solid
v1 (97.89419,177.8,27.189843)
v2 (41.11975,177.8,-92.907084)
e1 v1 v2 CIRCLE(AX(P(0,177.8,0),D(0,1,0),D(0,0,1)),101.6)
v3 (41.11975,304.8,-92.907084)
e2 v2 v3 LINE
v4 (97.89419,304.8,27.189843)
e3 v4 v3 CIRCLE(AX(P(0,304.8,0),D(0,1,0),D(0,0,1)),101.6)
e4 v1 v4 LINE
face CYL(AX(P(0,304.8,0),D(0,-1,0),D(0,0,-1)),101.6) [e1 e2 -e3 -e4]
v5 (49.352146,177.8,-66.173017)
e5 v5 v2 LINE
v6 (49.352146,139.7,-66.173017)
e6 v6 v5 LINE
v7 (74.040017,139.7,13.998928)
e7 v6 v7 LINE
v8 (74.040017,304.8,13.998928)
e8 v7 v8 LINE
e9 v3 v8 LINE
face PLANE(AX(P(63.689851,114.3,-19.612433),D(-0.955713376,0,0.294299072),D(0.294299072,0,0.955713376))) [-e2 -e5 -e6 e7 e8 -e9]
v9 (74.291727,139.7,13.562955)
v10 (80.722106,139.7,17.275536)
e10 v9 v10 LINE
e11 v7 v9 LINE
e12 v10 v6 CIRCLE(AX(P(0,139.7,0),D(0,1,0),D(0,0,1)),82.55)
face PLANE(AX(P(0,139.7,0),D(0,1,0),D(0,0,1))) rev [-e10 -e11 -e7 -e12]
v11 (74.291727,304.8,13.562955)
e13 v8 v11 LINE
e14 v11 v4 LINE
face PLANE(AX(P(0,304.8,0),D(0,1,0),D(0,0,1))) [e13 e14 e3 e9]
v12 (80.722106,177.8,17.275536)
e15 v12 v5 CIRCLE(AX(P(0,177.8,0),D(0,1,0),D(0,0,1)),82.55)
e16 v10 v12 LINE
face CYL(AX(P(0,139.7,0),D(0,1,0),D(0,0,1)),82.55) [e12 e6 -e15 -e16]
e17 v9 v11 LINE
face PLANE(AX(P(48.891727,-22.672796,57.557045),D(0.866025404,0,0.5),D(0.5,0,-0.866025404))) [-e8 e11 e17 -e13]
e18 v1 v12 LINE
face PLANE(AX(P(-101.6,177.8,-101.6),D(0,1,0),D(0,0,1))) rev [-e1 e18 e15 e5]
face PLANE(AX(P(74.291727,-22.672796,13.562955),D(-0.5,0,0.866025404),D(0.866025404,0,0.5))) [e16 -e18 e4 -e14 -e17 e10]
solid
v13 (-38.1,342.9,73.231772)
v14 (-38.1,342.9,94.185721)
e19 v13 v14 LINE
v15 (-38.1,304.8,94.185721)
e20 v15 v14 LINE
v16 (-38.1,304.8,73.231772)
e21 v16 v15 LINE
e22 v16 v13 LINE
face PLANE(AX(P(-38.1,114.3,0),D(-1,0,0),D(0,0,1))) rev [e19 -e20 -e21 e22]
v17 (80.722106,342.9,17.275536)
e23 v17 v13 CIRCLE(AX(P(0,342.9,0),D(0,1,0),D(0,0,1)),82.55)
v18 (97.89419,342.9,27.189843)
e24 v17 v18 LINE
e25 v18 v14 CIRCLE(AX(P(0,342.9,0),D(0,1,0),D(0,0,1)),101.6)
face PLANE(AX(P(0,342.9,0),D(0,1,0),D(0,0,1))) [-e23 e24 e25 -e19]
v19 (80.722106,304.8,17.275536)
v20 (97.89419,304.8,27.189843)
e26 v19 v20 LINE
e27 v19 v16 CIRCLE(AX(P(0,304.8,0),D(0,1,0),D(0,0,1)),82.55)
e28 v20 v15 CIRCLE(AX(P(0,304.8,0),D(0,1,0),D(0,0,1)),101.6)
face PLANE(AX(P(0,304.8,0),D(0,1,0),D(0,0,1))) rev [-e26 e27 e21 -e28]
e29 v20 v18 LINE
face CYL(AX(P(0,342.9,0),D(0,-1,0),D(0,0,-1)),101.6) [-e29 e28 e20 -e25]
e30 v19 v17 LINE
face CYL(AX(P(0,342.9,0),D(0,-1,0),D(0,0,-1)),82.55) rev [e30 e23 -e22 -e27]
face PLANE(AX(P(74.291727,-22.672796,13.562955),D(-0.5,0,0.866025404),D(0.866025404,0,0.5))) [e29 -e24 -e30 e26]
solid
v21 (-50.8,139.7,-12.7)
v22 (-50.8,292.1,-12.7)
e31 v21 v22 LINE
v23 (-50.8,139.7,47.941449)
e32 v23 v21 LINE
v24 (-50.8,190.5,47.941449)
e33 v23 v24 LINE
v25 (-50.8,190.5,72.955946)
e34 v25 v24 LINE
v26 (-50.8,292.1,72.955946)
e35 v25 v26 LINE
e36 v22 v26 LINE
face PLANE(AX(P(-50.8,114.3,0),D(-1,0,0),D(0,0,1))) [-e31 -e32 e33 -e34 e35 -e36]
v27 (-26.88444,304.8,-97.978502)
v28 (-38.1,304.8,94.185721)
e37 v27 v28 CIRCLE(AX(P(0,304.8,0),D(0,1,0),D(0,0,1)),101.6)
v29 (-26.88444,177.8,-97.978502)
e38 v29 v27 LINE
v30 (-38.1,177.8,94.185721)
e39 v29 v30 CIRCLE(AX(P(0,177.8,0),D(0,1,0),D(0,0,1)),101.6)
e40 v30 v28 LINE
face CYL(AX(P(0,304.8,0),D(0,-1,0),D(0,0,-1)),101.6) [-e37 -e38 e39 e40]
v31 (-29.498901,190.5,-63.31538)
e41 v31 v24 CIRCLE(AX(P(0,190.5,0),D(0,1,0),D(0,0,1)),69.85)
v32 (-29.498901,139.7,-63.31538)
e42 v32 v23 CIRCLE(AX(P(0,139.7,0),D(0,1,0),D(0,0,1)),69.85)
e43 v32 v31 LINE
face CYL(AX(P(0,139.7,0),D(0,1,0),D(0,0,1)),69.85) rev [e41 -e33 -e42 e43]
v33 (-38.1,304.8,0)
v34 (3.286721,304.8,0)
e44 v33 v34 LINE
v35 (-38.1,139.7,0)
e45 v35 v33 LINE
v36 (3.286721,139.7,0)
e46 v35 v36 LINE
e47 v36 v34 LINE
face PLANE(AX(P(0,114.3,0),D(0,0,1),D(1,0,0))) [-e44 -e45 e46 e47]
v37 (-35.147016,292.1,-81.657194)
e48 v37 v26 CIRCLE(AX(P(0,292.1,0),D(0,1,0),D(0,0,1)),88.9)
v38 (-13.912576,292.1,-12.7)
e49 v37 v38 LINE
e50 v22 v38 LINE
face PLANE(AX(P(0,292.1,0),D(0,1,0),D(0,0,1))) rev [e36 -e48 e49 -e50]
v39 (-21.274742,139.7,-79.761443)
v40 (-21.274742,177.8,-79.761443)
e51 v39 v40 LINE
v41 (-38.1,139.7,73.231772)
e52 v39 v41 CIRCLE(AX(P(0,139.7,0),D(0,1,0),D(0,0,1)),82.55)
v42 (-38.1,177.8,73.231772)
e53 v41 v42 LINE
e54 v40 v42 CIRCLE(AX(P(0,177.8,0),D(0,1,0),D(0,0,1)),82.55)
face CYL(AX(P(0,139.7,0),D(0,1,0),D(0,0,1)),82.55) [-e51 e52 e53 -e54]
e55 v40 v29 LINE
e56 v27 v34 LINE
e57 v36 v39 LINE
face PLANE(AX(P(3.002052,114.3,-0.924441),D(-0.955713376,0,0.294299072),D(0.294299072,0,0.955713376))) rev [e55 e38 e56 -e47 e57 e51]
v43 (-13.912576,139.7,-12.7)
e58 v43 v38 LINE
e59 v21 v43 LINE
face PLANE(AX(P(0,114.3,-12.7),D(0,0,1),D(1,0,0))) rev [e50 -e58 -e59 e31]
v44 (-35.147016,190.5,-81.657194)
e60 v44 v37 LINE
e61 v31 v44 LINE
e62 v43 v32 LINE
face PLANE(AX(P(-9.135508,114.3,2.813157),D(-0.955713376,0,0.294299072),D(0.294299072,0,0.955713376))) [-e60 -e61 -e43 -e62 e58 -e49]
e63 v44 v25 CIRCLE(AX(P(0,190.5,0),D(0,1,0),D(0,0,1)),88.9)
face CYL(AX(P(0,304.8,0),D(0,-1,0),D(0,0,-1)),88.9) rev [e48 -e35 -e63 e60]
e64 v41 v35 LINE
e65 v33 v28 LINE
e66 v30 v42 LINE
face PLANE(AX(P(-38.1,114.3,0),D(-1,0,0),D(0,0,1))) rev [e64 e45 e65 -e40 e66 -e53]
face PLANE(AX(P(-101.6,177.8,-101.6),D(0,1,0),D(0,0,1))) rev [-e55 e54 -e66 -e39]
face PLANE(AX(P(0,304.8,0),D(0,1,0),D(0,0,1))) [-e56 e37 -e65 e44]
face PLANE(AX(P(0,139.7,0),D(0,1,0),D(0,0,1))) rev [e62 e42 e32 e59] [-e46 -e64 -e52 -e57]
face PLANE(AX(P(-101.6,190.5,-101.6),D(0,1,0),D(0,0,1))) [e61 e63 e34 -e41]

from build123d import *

# Parameters (mm, degrees)
SKETCH2_R               = 101.6
BOSS_EXTRUDE1_DEPTH     = 304.8
SKETCH3_R               = 101.6
SKETCH3_R_2             = 82.55
BOSS_EXTRUDE2_DEPTH     = 38.1
SKETCH4_W               = 76.2
SKETCH4_H               = 101.6
CUT_EXTRUDE1_DEPTH      = 228.6
CUT_EXTRUDE2_START      = -228.6
CUT_EXTRUDE2_DEPTH      = 190.5
SKETCH5_R               = 76.2
CUT_EXTRUDE3_DEPTH      = 25.4
CUT_EXTRUDE4_START      = -228.6
CUT_EXTRUDE4_DEPTH      = 228.6
CUT_EXTRUDE5_DEPTH      = 372.786941675
CUT_EXTRUDE6_DEPTH      = 372.786941675
CUT_EXTRUDE6_DEPTH_BACK = 372.786941675
SKETCH8_W               = 203.2
SKETCH8_H               = 177.8
BOSS_EXTRUDE3_START     = -165.1
BOSS_EXTRUDE3_DEPTH     = 38.1
SHELL1_START            = 190.5
SHELL1_DEPTH            = 101.6
SHELL1_START_2          = 139.7
SHELL1_2_DEPTH          = 50.8


# Read off the part's stored shape, not the designer's step: Shell1
with BuildPart() as part:
    # Sketch2 → Boss-Extrude1 (new body)
    with BuildSketch(Plane(origin=(0, 0, 0), x_dir=(1, 0, 0), z_dir=(0, 1, 0))):
        with Locations(Location((0, 0, 0), (0, 0, 90))):
            Circle(SKETCH2_R)
    extrude(amount=BOSS_EXTRUDE1_DEPTH)


with BuildPart() as body_2:
    # Sketch3 → Boss-Extrude2 (new body)
    with BuildSketch(Plane(origin=(0, 304.8, 0), x_dir=(1, 0, 0), z_dir=(0, 1, 0))):
        with Locations(Location((0, 0, 0), (0, 0, 90))):
            Circle(SKETCH3_R)
        with Locations(Location((0, 0, 0), (0, 0, 90))):
            Circle(SKETCH3_R_2, mode=Mode.SUBTRACT)
    extrude(amount=BOSS_EXTRUDE2_DEPTH)


with BuildPart() as cut_extrude1_tool:
    # Sketch4 → Cut-Extrude1 (new body)
    with BuildSketch(Plane(origin=(0, 342.9, 0), x_dir=(1, 0, 0), z_dir=(0, 1, 0))):
        with Locations((0, -50.8)):
            Rectangle(SKETCH4_W, SKETCH4_H)
    extrude(amount=-CUT_EXTRUDE1_DEPTH)


with BuildPart() as part_1:
    add(part.part)

    # Cut-Extrude1: cut by cut_extrude1_tool
    add(cut_extrude1_tool.part, mode=Mode.SUBTRACT)

    # Sketch4<4> → Cut-Extrude2 (cut)
    with BuildSketch(Plane(origin=(0, 342.9, 0), x_dir=(1, 0, 0), z_dir=(0, 1, 0)).offset(CUT_EXTRUDE2_START)):
        with BuildLine():
            ThreePointArc((78.027556588, -26.94815231), (62.505565542, -53.92176533), (38.1, -73.231772476))
            Line((38.1, -73.231772476), (38.1, -94.185720786))
            ThreePointArc((38.1, -94.185720786), (65.394822961, -77.756524678), (86.259952515, -53.682218584))
            Line((86.259952515, -53.682218584), (78.027556588, -26.94815231))
        make_face()
        with BuildLine():
            Line((-21.27474203, 79.761443389), (3.286721048, 0))
            Line((3.286721048, 0), (38.1, 0))
            Line((38.1, 0), (38.1, -73.231772476))
            ThreePointArc((38.1, -73.231772476), (62.505565542, -53.92176533), (78.027556588, -26.94815231))
            Line((78.027556588, -26.94815231), (49.352145598, 66.173017347))
            ThreePointArc((49.352145598, 66.173017347), (15.596361061, 81.063284054), (-21.27474203, 79.761443389))
        make_face()
        with BuildLine():
            Line((-26.884440108, 97.978502132), (-21.27474203, 79.761443389))
            ThreePointArc((-21.27474203, 79.761443389), (15.596361061, 81.063284054), (49.352145598, 66.173017347))
            Line((49.352145598, 66.173017347), (41.119749671, 92.907083621))
            ThreePointArc((41.119749671, 92.907083621), (7.555847472, 101.318651634), (-26.884440108, 97.978502132))
        make_face()
    extrude(amount=CUT_EXTRUDE2_DEPTH, mode=Mode.SUBTRACT)

    # Sketch5 → Cut-Extrude3 (cut)
    with BuildSketch(Plane.XZ):
        with Locations(Location((0, 0, 0), (0, 0, 270))):
            Circle(SKETCH5_R)
    extrude(amount=-CUT_EXTRUDE3_DEPTH, mode=Mode.SUBTRACT)


with BuildPart() as body_2_1:
    add(body_2.part)

    # Cut-Extrude1: cut by cut_extrude1_tool
    add(cut_extrude1_tool.part, mode=Mode.SUBTRACT)


with BuildPart() as cut_extrude4_tool:
    # Sketch6 → Cut-Extrude4 (new body)
    with BuildSketch(Plane(origin=(0, 342.9, 0), x_dir=(1, 0, 0), z_dir=(0, 1, 0)).offset(CUT_EXTRUDE4_START)):
        Polygon((48.891726717, -57.557045256), (74.291726717, -13.562954744), (107.287294601, -32.612954744), (60.297294601, -114.002022192), (14.155449479, -87.362015489), (35.745449479, -49.967038554), align=None)
    extrude(amount=CUT_EXTRUDE4_DEPTH)


with BuildPart() as part_2:
    add(part_1.part)

    # Cut-Extrude4: cut by cut_extrude4_tool
    add(cut_extrude4_tool.part, mode=Mode.SUBTRACT)

    # Sketch6<4> → Cut-Extrude5 (cut, through all)
    with BuildSketch(Plane(origin=(0, 342.9, 0), x_dir=(1, 0, 0), z_dir=(0, 1, 0))):
        with BuildLine():
            ThreePointArc((97.894189943, -27.189843241), (87.988181024, -50.8), (72.494189943, -71.183933753))
            Line((72.494189943, -71.183933753), (81.887294601, -76.607045256))
            Line((81.887294601, -76.607045256), (107.287294601, -32.612954744))
            Line((107.287294601, -32.612954744), (97.894189943, -27.189843241))
        make_face()
        with BuildLine():
            ThreePointArc((80.722105782, -17.275535828), (71.490397082, -41.275), (55.322105782, -61.26962634))
            Line((55.322105782, -61.26962634), (72.494189943, -71.183933753))
            ThreePointArc((72.494189943, -71.183933753), (87.988181024, -50.8), (97.894189943, -27.189843241))
            Line((97.894189943, -27.189843241), (80.722105782, -17.275535828))
        make_face()
        with BuildLine():
            Line((74.291726717, -13.562954744), (48.891726717, -57.557045256))
            Line((48.891726717, -57.557045256), (55.322105782, -61.26962634))
            ThreePointArc((55.322105782, -61.26962634), (71.490397082, -41.275), (80.722105782, -17.275535828))
            Line((80.722105782, -17.275535828), (74.291726717, -13.562954744))
        make_face()
    extrude(amount=-CUT_EXTRUDE5_DEPTH, mode=Mode.SUBTRACT)

    # Sketch8 → Cut-Extrude6 (cut, two sides: drawn at the far end of the back side and taken through both)
    with BuildSketch(Plane.XY.offset(-CUT_EXTRUDE6_DEPTH_BACK)):
        with Locations((0, 88.9)):
            Rectangle(SKETCH8_W, SKETCH8_H)
    extrude(amount=CUT_EXTRUDE6_DEPTH + CUT_EXTRUDE6_DEPTH_BACK, mode=Mode.SUBTRACT)


with BuildPart() as body_2_2:
    add(body_2_1.part)

    # Cut-Extrude4: cut by cut_extrude4_tool
    add(cut_extrude4_tool.part, mode=Mode.SUBTRACT)


with BuildPart() as cut_extrude6_piece_1:
    # of the separate pieces the step leaves, piece 1, a body of its own (cut_extrude6_pieces)
    add(part_2.part.solids().sort_by_distance((-26.884440108, 177.8, -97.978502132))[0])



with BuildPart() as cut_extrude6_piece_2:
    # of the separate pieces the step leaves, piece 2, a body of its own (cut_extrude6_pieces)
    add(part_2.part.solids().sort_by_distance((41.119749671, 177.8, -92.907083621))[0])


with BuildPart() as cut_extrude6_piece_1_1:
    add(cut_extrude6_piece_1.part)

    add(cut_extrude6_piece_2.part)  # Boss-Extrude3 merges Cut-Extrude6 piece 2
    # Sketch7 → Boss-Extrude3 (add)
    with BuildSketch(Plane(origin=(0, 342.9, 0), x_dir=(1, 0, 0), z_dir=(0, 1, 0)).offset(BOSS_EXTRUDE3_START)):
        with BuildLine():
            Line((3.286721048, 0), (-21.27474203, 79.761443389))
            ThreePointArc((-21.27474203, 79.761443389), (-82.055292474, 9.023939106), (-38.1, -73.231772476))
            Line((-38.1, -73.231772476), (-38.1, 0))
            Line((-38.1, 0), (3.286721048, 0))
        make_face()
        with BuildLine():
            Line((74.291726717, -13.562954744), (80.722105782, -17.275535828))
            ThreePointArc((80.722105782, -17.275535828), (77.270582855, 29.047539056), (49.352145598, 66.173017347))
            Line((49.352145598, 66.173017347), (74.040017303, -13.998928238))
            Line((74.040017303, -13.998928238), (74.291726717, -13.562954744))
        make_face()
    extrude(amount=-BOSS_EXTRUDE3_DEPTH)

    # Shell1 outline → Shell1 (cut)
    with BuildSketch(Plane(origin=(0, 0, 0), x_dir=(1, 0, 0), z_dir=(0, 1, 0)).offset(SHELL1_START)):
        with BuildLine():
            ThreePointArc((-35.147015765, 81.657193699), (-88.447883477, 8.954435127), (-50.8, -72.955945611))
            Line((-50.8, -72.955945611), (-50.8, 12.7))
            Line((-50.8, 12.7), (-13.912575978, 12.7))
            Line((-13.912575978, 12.7), (-35.147015765, 81.657193699))
        make_face()
    extrude(amount=SHELL1_DEPTH, mode=Mode.SUBTRACT)

    # Shell1 2 outline → Shell1 2 (cut)
    with BuildSketch(Plane(origin=(0, 0, 0), x_dir=(1, 0, 0), z_dir=(0, 1, 0)).offset(SHELL1_START_2)):
        with BuildLine():
            ThreePointArc((-29.498901057, 63.315379936), (-68.603927404, 13.134825645), (-50.8, -47.941448664))
            Line((-50.8, -47.941448664), (-50.8, 12.7))
            Line((-50.8, 12.7), (-13.912575978, 12.7))
            Line((-13.912575978, 12.7), (-29.498901057, 63.315379936))
        make_face()
    extrude(amount=SHELL1_2_DEPTH, mode=Mode.SUBTRACT)


solid = Compound([body_2_2.part, cut_extrude6_piece_1_1.part])
